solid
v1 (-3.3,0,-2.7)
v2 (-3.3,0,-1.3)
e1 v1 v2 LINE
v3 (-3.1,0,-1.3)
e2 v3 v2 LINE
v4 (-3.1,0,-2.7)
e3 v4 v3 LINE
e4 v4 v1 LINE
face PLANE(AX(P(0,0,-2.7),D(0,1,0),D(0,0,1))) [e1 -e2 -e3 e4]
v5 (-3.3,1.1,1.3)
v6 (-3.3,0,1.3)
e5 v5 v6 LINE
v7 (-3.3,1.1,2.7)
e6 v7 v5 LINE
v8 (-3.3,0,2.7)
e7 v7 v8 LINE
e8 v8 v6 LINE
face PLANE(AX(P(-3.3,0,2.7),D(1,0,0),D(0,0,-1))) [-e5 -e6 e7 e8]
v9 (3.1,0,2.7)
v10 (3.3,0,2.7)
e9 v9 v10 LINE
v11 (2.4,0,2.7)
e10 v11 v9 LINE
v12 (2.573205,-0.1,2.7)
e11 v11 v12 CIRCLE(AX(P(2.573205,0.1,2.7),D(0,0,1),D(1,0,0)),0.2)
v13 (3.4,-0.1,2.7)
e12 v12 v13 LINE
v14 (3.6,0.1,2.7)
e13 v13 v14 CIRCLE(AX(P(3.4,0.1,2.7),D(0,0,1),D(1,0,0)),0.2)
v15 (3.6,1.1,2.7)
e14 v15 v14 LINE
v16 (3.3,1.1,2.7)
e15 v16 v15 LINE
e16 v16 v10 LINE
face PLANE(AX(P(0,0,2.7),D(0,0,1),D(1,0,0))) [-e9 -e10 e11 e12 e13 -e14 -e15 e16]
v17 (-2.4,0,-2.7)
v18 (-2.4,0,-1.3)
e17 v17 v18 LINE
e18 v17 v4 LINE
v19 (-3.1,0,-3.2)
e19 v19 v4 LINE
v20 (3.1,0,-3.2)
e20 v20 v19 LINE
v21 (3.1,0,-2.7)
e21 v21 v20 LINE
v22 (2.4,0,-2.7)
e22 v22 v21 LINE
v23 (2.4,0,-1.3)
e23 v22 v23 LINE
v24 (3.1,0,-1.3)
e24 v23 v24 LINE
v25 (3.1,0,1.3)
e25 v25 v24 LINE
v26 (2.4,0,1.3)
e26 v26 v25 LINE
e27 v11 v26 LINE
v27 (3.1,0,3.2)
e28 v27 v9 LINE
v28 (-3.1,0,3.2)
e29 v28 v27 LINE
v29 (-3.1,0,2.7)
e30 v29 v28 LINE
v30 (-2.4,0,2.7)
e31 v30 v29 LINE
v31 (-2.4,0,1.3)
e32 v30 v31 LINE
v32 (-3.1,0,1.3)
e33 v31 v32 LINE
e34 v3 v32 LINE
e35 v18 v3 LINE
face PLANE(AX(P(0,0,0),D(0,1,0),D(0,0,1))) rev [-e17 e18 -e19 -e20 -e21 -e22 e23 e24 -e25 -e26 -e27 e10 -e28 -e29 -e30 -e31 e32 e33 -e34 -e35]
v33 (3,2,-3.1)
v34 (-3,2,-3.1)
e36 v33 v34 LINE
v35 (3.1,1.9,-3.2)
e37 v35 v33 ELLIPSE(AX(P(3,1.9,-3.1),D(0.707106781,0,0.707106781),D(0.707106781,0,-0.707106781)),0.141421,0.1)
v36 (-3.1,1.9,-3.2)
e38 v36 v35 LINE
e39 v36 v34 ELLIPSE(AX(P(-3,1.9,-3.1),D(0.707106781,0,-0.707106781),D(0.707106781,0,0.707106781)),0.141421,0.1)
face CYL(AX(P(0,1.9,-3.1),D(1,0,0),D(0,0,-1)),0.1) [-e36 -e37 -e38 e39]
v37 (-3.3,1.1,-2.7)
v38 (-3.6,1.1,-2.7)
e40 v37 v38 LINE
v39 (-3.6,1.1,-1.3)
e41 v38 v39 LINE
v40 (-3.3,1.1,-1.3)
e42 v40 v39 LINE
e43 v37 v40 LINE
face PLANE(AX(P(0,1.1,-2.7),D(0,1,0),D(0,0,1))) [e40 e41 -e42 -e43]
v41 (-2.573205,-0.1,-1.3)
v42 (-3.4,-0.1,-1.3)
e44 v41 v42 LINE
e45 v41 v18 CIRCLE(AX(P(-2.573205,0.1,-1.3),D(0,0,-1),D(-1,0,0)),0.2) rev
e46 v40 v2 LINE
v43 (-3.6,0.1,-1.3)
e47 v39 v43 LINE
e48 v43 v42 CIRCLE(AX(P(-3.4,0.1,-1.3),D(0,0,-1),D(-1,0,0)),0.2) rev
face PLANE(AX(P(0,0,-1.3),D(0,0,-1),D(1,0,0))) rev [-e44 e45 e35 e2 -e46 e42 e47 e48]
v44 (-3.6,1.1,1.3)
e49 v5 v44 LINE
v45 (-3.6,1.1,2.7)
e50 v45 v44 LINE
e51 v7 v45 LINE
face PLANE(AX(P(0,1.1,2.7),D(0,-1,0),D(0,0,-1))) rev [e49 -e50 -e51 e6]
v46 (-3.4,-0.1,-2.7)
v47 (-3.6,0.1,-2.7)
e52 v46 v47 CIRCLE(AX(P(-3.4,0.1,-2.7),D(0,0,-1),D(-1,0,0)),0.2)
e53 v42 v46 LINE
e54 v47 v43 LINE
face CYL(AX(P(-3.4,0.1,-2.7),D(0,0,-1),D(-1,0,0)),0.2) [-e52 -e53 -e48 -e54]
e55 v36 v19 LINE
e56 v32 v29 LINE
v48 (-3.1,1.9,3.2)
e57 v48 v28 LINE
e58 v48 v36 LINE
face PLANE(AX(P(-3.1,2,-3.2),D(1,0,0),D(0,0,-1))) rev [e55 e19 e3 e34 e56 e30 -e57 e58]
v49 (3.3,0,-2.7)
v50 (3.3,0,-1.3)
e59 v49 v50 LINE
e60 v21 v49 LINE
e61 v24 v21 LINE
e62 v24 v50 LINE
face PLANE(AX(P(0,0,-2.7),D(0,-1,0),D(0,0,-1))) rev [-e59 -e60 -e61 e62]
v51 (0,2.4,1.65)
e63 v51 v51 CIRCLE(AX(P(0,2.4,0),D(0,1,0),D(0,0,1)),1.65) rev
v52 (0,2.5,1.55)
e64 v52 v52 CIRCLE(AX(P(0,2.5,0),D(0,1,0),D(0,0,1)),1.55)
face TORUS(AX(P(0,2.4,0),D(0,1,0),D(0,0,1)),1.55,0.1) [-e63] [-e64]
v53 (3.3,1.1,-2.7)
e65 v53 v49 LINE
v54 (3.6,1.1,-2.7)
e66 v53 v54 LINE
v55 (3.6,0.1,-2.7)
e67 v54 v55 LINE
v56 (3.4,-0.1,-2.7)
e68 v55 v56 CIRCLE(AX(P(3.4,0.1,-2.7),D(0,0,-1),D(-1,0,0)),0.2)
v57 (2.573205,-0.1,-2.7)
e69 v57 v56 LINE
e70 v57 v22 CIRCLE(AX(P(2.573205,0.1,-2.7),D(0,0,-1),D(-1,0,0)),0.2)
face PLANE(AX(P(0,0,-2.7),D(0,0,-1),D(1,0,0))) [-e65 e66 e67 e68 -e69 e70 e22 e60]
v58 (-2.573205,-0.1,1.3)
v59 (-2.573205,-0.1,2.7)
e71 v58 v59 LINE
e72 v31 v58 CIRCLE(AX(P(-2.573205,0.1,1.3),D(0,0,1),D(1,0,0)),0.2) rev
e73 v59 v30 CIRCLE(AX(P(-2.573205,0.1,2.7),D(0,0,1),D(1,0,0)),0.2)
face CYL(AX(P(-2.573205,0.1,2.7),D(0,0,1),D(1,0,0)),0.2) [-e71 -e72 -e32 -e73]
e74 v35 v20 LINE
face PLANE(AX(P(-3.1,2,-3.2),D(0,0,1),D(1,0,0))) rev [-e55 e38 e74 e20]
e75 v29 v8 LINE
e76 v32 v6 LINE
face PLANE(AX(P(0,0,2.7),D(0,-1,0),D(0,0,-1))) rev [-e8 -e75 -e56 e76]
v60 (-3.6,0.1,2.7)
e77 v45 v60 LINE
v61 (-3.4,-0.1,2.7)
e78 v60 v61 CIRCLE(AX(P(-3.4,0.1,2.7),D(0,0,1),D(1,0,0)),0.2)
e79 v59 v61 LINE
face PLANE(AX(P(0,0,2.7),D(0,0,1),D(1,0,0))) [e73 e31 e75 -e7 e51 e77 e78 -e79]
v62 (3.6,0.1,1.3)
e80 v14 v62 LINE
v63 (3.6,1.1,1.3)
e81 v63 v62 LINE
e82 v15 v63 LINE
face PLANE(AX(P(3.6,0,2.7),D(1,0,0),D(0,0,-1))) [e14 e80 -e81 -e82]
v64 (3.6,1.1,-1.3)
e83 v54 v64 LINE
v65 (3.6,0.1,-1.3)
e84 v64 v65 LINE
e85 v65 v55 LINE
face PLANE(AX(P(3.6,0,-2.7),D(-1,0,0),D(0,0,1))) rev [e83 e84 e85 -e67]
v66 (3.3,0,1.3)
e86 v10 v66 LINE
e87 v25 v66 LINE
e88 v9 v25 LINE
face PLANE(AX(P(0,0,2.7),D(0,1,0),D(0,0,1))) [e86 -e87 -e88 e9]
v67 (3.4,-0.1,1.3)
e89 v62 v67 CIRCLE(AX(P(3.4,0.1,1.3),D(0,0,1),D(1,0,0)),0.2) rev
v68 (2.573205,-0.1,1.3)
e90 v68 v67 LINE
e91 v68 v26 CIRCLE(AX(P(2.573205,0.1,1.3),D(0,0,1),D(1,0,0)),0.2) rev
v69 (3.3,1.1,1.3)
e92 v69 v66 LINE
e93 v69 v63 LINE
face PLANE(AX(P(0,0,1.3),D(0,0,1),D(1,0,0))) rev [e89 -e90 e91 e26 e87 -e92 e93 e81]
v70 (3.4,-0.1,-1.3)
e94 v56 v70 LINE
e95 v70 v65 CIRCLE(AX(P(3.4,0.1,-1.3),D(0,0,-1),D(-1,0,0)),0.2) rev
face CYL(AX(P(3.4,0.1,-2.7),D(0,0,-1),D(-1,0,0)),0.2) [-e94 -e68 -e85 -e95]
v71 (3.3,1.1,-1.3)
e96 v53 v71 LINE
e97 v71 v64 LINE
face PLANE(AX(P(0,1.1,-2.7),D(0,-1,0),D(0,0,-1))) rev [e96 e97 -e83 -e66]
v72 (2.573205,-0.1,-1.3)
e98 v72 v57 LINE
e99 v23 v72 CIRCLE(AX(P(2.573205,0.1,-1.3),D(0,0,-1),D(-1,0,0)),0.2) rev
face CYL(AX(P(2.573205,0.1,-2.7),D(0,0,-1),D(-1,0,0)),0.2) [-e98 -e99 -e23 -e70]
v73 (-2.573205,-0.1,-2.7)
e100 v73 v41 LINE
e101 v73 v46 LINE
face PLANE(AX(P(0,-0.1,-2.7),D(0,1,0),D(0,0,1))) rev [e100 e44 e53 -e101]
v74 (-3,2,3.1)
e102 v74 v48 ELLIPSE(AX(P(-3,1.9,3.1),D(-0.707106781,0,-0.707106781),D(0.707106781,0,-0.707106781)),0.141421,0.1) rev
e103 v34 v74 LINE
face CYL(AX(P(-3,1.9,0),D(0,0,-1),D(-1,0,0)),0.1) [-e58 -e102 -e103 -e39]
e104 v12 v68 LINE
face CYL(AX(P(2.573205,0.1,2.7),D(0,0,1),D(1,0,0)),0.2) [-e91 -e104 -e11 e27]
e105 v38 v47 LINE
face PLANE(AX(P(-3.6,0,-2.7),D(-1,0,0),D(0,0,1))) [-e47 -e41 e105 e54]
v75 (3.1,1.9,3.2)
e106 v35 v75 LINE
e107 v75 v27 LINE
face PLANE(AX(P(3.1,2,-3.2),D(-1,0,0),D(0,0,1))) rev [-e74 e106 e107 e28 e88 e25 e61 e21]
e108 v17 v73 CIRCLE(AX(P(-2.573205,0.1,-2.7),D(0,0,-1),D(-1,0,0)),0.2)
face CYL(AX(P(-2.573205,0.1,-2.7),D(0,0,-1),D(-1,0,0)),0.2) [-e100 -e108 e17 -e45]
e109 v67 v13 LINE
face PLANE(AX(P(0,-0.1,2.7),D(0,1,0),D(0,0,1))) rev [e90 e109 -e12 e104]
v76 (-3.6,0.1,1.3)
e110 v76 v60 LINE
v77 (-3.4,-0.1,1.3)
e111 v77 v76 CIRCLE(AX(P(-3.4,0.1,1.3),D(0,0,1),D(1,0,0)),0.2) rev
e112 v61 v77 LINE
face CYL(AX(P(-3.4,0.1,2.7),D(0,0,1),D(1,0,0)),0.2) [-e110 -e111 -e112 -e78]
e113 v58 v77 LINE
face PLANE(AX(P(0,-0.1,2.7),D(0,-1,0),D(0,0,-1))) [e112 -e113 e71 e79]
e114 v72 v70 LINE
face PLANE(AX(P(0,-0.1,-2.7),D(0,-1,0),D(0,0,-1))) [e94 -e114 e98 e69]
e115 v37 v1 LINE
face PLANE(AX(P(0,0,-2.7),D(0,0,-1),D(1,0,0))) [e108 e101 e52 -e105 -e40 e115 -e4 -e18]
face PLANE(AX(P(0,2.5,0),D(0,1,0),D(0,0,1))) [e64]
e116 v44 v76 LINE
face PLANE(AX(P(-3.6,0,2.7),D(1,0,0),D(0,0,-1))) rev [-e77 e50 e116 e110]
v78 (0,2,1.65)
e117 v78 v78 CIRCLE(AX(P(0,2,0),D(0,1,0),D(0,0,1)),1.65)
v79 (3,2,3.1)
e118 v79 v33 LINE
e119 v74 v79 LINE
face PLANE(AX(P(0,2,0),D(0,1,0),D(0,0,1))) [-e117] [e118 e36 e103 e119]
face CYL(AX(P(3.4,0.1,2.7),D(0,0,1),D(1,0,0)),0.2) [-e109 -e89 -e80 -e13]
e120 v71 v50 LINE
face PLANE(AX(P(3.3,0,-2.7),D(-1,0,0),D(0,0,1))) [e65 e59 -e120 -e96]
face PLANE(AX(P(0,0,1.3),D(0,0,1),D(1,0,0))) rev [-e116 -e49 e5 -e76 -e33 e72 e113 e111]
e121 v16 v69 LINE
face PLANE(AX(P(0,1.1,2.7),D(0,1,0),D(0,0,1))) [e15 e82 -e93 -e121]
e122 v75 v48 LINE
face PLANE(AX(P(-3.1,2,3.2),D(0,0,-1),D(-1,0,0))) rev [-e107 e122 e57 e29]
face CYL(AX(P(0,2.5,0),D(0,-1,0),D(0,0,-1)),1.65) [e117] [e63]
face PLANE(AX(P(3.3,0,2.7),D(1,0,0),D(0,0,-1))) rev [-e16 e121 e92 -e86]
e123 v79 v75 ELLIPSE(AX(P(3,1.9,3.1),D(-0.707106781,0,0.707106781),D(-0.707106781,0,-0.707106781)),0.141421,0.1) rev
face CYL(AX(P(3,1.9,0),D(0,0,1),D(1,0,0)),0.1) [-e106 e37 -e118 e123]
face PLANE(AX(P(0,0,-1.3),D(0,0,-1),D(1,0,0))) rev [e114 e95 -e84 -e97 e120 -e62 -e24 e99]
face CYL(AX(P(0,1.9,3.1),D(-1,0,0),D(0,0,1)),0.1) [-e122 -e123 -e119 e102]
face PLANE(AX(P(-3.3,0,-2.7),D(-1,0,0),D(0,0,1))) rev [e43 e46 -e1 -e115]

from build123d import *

# Parameters (mm, degrees)
ESQUISSE1_W           = 6.2
ESQUISSE1_H           = 6.4
BOSS_EXTRU_1_DEPTH    = 2
ESQUISSE2_R           = 1.65
BOSS_EXTRU_2_DEPTH    = 0.5
BOSS_EXTRU_4_START    = 1.3
BOSS_EXTRU_4_DEPTH    = 1.4
CONG_2_R              = 0.2
CONG_2_OF_SYM_TRIE2_R = 0.2
CONG_3_R              = 0.1
CONG_4_R              = 0.1


with BuildPart() as part:
    # Esquisse1 → Boss.-Extru.1 (new body)
    with BuildSketch(Plane(origin=(0, 0, 0), x_dir=(1, 0, 0), z_dir=(0, 1, 0))):
        Rectangle(ESQUISSE1_W, ESQUISSE1_H)
    extrude(amount=BOSS_EXTRU_1_DEPTH)

    # Esquisse2 → Boss.-Extru.2 (add)
    with BuildSketch(Plane(origin=(0, 2, 0), x_dir=(1, 0, 0), z_dir=(0, 1, 0))):
        with Locations(Location((0, 0, 0), (0, 0, 270))):
            Circle(ESQUISSE2_R)
    extrude(amount=BOSS_EXTRU_2_DEPTH)

    # Esquisse4 → Boss.-Extru.4 (add)
    with BuildSketch(Plane.XY.offset(BOSS_EXTRU_4_START)):
        Polygon((3.1, 0), (2.4, 0), (2.4, -0.1), (3.6, -0.1), (3.6, 1.1), (3.3, 1.1), (3.3, 0), align=None)
        Polygon((-2.4, -0.1), (-2.4, 0), (-3.3, 0), (-3.3, 1.1), (-3.6, 1.1), (-3.6, -0.1), align=None)
    boss_extru_4 = extrude(amount=BOSS_EXTRU_4_DEPTH)

    # Congé2
    # the kernel refuses this fillet: 0.2 mm, written as the material it takes off along each edge
    with BuildSketch(Plane(origin=(-2.4, -0.1, 0.866987298), x_dir=(0, 1, 0), z_dir=(0, 0, 1))) as cong_2_piece_1:
        with BuildLine():
            CenterArc((0.2, 0.173205081), CONG_2_R, 180, 60)
            Line((0, 0.173205081), (-0.004, 0.173205081))
            Line((-0.004, 0.173205081), (-0.004, 0))
            Line((-0.004, 0), (0, -0.004))
            ThreePointArc((0, -0.004), (0.05, -0.004), (0.098, -0.003464102))
            Line((0.098, -0.003464102), (0.1, 0))
        make_face()
    extrude(amount=2.266025404, mode=Mode.SUBTRACT)
    with BuildSketch(Plane(origin=(2.4, -0.1, 0.866987298), x_dir=(0, 1, 0), z_dir=(0, 0, 1))) as cong_2_piece_2:
        with BuildLine():
            CenterArc((0.2, -0.173205081), CONG_2_R, 120, 60)
            Line((0, -0.173205081), (-0.004, -0.173205081))
            Line((-0.004, -0.173205081), (-0.004, 0))
            Line((-0.004, 0), (0, 0.004))
            ThreePointArc((0, 0.004), (0.05, 0.004), (0.098, 0.003464102))
            Line((0.098, 0.003464102), (0.1, 0))
        make_face()
    extrude(amount=2.266025404, mode=Mode.SUBTRACT)
    with BuildSketch(Plane(origin=(3.6, -0.1, 0.8), x_dir=(0, 1, 0), z_dir=(0, 0, 1))) as cong_2_piece_3:
        with BuildLine():
            CenterArc((CONG_2_R, CONG_2_R), CONG_2_R, 180, 90)
            Line((0, CONG_2_R), (-CONG_2_R * 0.02, CONG_2_R))
            Line((-CONG_2_R * 0.02, CONG_2_R), (-CONG_2_R * 0.02, -CONG_2_R * 0.02))
            Line((-CONG_2_R * 0.02, -CONG_2_R * 0.02), (CONG_2_R, -CONG_2_R * 0.02))
            Line((CONG_2_R, -CONG_2_R * 0.02), (CONG_2_R, 0))
        make_face()
    extrude(amount=2.4, mode=Mode.SUBTRACT)
    with BuildSketch(Plane(origin=(-3.6, -0.1, 0.8), x_dir=(0, 1, 0), z_dir=(0, 0, 1))) as cong_2_piece_4:
        with BuildLine():
            CenterArc((CONG_2_R, -CONG_2_R), CONG_2_R, 90, 90)
            Line((0, -CONG_2_R), (-CONG_2_R * 0.02, -CONG_2_R))
            Line((-CONG_2_R * 0.02, -CONG_2_R), (-CONG_2_R * 0.02, CONG_2_R * 0.02))
            Line((-CONG_2_R * 0.02, CONG_2_R * 0.02), (CONG_2_R, CONG_2_R * 0.02))
            Line((CONG_2_R, CONG_2_R * 0.02), (CONG_2_R, 0))
        make_face()
    extrude(amount=2.4, mode=Mode.SUBTRACT)

    # Symétrie2: Boss.-Extru.4 across plane
    add(boss_extru_4.mirror(Plane.XY))

    # Congé2 of Symétrie2
    # the kernel refuses this fillet: 0.2 mm, written as the material it takes off along each edge
    with BuildSketch(Plane(origin=(-2.4, -0.1, -0.866987298), x_dir=(0, 1, 0), z_dir=(0, 0, -1))) as cong_2_of_sym_trie2_piece_1:
        with BuildLine():
            CenterArc((0.2, -0.173205081), CONG_2_OF_SYM_TRIE2_R, 120, 60)
            Line((0, -0.173205081), (-0.004, -0.173205081))
            Line((-0.004, -0.173205081), (-0.004, 0))
            Line((-0.004, 0), (0, 0.004))
            ThreePointArc((0, 0.004), (0.05, 0.004), (0.098, 0.003464102))
            Line((0.098, 0.003464102), (0.1, 0))
        make_face()
    extrude(amount=2.266025404, mode=Mode.SUBTRACT)
    with BuildSketch(Plane(origin=(2.4, -0.1, -0.866987298), x_dir=(0, 1, 0), z_dir=(0, 0, -1))) as cong_2_of_sym_trie2_piece_2:
        with BuildLine():
            CenterArc((0.2, 0.173205081), CONG_2_OF_SYM_TRIE2_R, 180, 60)
            Line((0, 0.173205081), (-0.004, 0.173205081))
            Line((-0.004, 0.173205081), (-0.004, 0))
            Line((-0.004, 0), (0, -0.004))
            ThreePointArc((0, -0.004), (0.05, -0.004), (0.098, -0.003464102))
            Line((0.098, -0.003464102), (0.1, 0))
        make_face()
    extrude(amount=2.266025404, mode=Mode.SUBTRACT)
    with BuildSketch(Plane(origin=(3.6, -0.1, -0.8), x_dir=(0, 1, 0), z_dir=(0, 0, -1))) as cong_2_of_sym_trie2_piece_3:
        with BuildLine():
            CenterArc((CONG_2_OF_SYM_TRIE2_R, -CONG_2_OF_SYM_TRIE2_R), CONG_2_OF_SYM_TRIE2_R, 90, 90)
            Line((0, -CONG_2_OF_SYM_TRIE2_R), (-CONG_2_OF_SYM_TRIE2_R * 0.02, -CONG_2_OF_SYM_TRIE2_R))
            Line((-CONG_2_OF_SYM_TRIE2_R * 0.02, -CONG_2_OF_SYM_TRIE2_R), (-CONG_2_OF_SYM_TRIE2_R * 0.02, CONG_2_OF_SYM_TRIE2_R * 0.02))
            Line((-CONG_2_OF_SYM_TRIE2_R * 0.02, CONG_2_OF_SYM_TRIE2_R * 0.02), (CONG_2_OF_SYM_TRIE2_R, CONG_2_OF_SYM_TRIE2_R * 0.02))
            Line((CONG_2_OF_SYM_TRIE2_R, CONG_2_OF_SYM_TRIE2_R * 0.02), (CONG_2_OF_SYM_TRIE2_R, 0))
        make_face()
    extrude(amount=2.4, mode=Mode.SUBTRACT)
    with BuildSketch(Plane(origin=(-3.6, -0.1, -0.8), x_dir=(0, 1, 0), z_dir=(0, 0, -1))) as cong_2_of_sym_trie2_piece_4:
        with BuildLine():
            CenterArc((CONG_2_OF_SYM_TRIE2_R, CONG_2_OF_SYM_TRIE2_R), CONG_2_OF_SYM_TRIE2_R, 180, 90)
            Line((0, CONG_2_OF_SYM_TRIE2_R), (-CONG_2_OF_SYM_TRIE2_R * 0.02, CONG_2_OF_SYM_TRIE2_R))
            Line((-CONG_2_OF_SYM_TRIE2_R * 0.02, CONG_2_OF_SYM_TRIE2_R), (-CONG_2_OF_SYM_TRIE2_R * 0.02, -CONG_2_OF_SYM_TRIE2_R * 0.02))
            Line((-CONG_2_OF_SYM_TRIE2_R * 0.02, -CONG_2_OF_SYM_TRIE2_R * 0.02), (CONG_2_OF_SYM_TRIE2_R, -CONG_2_OF_SYM_TRIE2_R * 0.02))
            Line((CONG_2_OF_SYM_TRIE2_R, -CONG_2_OF_SYM_TRIE2_R * 0.02), (CONG_2_OF_SYM_TRIE2_R, 0))
        make_face()
    extrude(amount=2.4, mode=Mode.SUBTRACT)

    # Congé3
    cong_3_edges = [part.edges().sort_by_distance(p)[0] for p in [
        (0, 2.5, -1.65),
    ]]
    fillet(cong_3_edges, radius=CONG_3_R)

    # Congé4
    cong_4_edges = [part.edges().sort_by_distance(p)[0] for p in [
        (3.1, 2, 0),
        (0, 2, -3.2),
        (-3.1, 2, 0),
        (0, 2, 3.2),
    ]]
    fillet(cong_4_edges, radius=CONG_4_R)


solid = part.part
